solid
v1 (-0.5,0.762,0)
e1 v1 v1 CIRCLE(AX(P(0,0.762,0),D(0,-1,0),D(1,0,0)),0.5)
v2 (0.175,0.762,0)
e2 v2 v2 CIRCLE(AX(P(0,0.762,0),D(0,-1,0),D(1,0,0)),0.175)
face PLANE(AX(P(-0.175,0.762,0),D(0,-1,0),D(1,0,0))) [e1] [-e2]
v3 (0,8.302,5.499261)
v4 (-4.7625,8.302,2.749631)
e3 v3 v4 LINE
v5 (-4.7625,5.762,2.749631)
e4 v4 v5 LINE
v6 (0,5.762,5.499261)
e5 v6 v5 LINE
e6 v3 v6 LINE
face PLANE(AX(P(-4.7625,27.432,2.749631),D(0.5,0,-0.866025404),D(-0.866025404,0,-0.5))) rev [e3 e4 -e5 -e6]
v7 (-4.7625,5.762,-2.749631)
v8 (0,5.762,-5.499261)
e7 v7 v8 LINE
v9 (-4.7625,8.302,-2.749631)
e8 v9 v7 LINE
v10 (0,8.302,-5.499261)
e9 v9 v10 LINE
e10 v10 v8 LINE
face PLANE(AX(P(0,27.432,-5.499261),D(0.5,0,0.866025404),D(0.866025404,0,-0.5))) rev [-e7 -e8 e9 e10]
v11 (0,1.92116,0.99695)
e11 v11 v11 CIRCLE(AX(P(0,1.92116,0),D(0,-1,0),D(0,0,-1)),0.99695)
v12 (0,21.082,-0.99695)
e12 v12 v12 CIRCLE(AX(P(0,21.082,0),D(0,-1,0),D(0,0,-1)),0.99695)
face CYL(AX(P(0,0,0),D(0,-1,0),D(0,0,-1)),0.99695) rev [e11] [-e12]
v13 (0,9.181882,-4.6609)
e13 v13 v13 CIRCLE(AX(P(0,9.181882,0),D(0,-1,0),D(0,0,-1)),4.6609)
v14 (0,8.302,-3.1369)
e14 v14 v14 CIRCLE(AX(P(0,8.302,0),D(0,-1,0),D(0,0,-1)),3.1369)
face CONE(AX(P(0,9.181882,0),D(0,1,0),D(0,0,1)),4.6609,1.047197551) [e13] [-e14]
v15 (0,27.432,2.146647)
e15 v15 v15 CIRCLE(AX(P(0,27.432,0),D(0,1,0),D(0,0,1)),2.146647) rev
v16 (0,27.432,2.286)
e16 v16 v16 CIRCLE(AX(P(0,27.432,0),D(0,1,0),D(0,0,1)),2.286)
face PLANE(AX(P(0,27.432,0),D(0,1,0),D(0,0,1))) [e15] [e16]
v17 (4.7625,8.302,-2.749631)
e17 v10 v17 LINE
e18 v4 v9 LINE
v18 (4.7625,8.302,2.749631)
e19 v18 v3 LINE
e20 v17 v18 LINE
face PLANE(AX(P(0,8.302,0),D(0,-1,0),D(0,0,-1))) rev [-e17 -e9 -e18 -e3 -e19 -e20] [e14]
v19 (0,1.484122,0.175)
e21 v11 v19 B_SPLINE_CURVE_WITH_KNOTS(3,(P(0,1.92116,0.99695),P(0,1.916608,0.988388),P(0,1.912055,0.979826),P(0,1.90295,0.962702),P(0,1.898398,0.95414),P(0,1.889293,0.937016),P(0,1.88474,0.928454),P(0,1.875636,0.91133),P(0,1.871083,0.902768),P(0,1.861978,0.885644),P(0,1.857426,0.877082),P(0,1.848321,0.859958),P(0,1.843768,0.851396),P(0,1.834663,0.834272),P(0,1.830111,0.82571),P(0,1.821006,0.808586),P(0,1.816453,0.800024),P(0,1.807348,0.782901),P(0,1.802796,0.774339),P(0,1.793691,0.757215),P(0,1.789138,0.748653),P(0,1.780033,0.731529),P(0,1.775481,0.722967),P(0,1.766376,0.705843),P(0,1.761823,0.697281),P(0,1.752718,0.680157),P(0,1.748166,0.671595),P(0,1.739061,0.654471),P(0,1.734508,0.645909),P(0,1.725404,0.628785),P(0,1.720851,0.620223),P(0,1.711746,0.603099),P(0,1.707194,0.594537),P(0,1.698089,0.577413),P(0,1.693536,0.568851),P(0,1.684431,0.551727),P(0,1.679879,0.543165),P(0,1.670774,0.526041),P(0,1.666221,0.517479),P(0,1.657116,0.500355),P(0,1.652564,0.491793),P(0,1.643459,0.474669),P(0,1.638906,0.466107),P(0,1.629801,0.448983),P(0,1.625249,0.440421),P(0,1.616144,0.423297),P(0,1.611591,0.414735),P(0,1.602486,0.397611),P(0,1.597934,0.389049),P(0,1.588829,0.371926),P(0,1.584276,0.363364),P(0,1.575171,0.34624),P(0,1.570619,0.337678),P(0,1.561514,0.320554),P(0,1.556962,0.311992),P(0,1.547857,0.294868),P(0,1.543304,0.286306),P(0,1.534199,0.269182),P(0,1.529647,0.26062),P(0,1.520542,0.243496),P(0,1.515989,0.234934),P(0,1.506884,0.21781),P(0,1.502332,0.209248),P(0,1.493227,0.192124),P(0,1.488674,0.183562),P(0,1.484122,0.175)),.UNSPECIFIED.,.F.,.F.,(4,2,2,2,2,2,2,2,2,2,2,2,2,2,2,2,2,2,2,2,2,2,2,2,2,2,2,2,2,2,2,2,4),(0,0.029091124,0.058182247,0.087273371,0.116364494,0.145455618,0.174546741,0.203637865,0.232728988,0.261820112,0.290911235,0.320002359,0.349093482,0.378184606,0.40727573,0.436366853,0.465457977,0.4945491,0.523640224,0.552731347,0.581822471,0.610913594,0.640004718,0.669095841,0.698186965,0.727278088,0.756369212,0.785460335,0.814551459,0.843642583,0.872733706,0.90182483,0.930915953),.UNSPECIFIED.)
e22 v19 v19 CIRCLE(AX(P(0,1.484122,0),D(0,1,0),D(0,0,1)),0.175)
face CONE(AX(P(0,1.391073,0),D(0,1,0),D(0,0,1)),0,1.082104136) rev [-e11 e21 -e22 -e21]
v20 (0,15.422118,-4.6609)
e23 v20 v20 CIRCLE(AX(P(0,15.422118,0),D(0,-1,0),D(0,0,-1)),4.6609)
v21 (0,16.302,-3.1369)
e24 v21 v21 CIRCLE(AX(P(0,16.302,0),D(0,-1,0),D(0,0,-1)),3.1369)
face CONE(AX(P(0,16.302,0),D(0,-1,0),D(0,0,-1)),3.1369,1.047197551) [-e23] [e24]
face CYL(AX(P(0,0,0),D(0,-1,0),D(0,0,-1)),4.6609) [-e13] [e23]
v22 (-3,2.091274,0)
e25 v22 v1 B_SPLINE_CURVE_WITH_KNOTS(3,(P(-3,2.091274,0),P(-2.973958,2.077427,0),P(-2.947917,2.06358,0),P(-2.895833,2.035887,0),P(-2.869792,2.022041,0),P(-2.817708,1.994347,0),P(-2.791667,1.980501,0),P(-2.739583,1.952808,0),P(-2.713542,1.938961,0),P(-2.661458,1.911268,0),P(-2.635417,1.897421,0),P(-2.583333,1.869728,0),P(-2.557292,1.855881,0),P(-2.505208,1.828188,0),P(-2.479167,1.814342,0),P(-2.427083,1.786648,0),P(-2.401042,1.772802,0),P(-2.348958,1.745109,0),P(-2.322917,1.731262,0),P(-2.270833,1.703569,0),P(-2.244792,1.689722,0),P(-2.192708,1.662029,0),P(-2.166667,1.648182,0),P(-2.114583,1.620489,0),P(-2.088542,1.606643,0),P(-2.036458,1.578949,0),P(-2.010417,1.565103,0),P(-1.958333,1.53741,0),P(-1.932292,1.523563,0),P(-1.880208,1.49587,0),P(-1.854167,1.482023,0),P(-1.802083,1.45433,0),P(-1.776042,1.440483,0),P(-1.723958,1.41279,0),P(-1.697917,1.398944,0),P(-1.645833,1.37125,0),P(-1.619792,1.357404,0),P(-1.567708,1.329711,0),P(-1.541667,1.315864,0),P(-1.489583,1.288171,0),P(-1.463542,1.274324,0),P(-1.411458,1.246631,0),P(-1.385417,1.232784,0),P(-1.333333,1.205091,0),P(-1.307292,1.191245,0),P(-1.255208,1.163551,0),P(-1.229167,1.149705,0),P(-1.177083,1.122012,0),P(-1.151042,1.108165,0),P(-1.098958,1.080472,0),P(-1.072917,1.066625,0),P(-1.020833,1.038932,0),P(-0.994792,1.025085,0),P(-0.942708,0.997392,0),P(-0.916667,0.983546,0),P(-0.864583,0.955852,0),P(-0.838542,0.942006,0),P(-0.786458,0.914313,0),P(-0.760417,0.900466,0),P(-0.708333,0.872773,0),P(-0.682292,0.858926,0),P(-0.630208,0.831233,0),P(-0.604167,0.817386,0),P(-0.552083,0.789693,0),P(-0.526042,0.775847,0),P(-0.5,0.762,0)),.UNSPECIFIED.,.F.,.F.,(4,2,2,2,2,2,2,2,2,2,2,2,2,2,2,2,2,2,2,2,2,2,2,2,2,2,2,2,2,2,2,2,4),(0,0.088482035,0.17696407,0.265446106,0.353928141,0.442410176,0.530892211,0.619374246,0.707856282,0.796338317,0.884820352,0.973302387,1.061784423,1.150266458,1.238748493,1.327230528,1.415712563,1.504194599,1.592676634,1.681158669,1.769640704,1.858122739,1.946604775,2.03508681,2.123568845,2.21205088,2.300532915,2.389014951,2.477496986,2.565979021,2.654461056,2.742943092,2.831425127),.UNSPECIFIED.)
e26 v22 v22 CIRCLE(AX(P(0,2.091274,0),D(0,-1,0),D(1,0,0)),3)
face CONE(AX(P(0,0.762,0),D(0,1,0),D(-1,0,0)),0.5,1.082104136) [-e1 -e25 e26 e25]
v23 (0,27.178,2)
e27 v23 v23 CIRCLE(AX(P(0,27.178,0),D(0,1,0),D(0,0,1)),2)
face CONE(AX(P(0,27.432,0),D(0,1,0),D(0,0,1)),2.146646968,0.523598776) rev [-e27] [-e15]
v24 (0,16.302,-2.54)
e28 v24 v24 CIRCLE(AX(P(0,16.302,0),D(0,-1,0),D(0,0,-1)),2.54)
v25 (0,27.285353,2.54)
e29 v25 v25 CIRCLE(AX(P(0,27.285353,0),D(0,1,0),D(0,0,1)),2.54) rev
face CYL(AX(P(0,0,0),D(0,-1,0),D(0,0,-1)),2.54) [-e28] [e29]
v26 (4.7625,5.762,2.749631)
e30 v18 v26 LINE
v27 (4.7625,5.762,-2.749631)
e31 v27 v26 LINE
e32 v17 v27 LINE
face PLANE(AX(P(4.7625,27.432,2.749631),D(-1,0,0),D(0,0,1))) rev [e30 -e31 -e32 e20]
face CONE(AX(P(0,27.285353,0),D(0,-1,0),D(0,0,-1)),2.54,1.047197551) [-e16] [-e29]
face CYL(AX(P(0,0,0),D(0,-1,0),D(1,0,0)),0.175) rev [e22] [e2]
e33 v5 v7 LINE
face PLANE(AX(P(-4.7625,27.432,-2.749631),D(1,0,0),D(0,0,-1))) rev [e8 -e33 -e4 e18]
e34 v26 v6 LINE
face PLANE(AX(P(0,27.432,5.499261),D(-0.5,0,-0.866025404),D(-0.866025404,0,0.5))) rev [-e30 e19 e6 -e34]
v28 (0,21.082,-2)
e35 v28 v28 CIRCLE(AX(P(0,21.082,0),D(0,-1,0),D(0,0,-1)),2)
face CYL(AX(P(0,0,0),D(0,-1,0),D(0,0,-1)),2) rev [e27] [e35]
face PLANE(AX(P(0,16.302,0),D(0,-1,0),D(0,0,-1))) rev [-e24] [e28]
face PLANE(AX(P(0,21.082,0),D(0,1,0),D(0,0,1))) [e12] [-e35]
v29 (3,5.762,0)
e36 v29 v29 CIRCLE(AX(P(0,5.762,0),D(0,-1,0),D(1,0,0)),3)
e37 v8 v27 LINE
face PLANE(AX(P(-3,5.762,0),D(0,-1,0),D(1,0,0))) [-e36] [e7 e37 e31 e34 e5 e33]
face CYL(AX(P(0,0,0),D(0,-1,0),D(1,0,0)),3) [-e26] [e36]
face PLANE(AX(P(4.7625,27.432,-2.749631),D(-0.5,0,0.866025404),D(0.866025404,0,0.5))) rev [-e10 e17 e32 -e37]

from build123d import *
from OCP.BRepFilletAPI import BRepFilletAPI_MakeChamfer

# Parameters (mm, degrees)
BOSS_EXTRUDE1_DEPTH = 27.432
CHAMFER1_SIZE       = 0.254
CHAMFER1_SIZE2      = 0.146646968


# Read off the part's stored shape, not the designer's step: Cut-Revolve4
with BuildPart() as part:
    # Sketch3 → Boss-Extrude1 (new body)
    with BuildSketch(Plane(origin=(0, 0, 0), x_dir=(1, 0, 0), z_dir=(0, 1, 0))):
        Polygon((4.7625, 2.749630657), (0, 5.499261314), (-4.7625, 2.749630657), (-4.7625, -2.749630657), (0, -5.499261314), (4.7625, -2.749630657), align=None)
    extrude(amount=BOSS_EXTRUDE1_DEPTH)

    # Cut-Revolve4 outline → Cut-Revolve4 (revolve, cut)
    with BuildSketch(Plane.XY):
        Polygon((4.6609, 9.18188181), (3.1369, 8.302), (5.499261314, 8.302), (5.499261314, 27.432), (2.54, 27.432), (2.54, 16.302), (3.1369, 16.302), (4.6609, 15.42211819), align=None)
        Polygon((0.99695, 21.082), (2, 21.082), (2, 27.432), (0, 27.432), (0, 1.391072642), (0.99695, 1.92116036), align=None)
    revolve(axis=Axis((0, 0, 0), (0, 1, 0)), mode=Mode.SUBTRACT)

    # Chamfer1: one chamfer whose edges measure the first distance from different faces: ONE call of the kernel's chamfer builder (chamfer() names one face for all edges)
    chamfer1_edges_1 = [part.edges().sort_by_distance(p)[0] for p in [
        (-2.54, 27.432, 0),
    ]]
    chamfer1_side_1 = [part.faces().sort_by_distance(p)[0] for p in [
        (-2.468157951, 27.432, 0),
    ]]
    chamfer1_edges_2 = [part.edges().sort_by_distance(p)[0] for p in [
        (-2, 27.432, 0),
    ]]
    chamfer1_side_2 = [part.faces().sort_by_distance(p)[0] for p in [
        (-2, 24.257, 0),
    ]]
    chamfer1 = BRepFilletAPI_MakeChamfer(part.part.solid().wrapped)
    for e in chamfer1_edges_1:
        chamfer1.Add(CHAMFER1_SIZE, CHAMFER1_SIZE2, e.wrapped, chamfer1_side_1[0].wrapped)  # the first distance lies on this face
    for e in chamfer1_edges_2:
        chamfer1.Add(CHAMFER1_SIZE, CHAMFER1_SIZE2, e.wrapped, chamfer1_side_2[0].wrapped)  # the first distance lies on this face
    add(Compound.cast(chamfer1.Shape()), mode=Mode.REPLACE)

    # Sketch4 → Cut-Revolve5 (revolve, cut)
    with BuildSketch(Plane.XY, mode=Mode.PRIVATE) as cut_revolve5_sk:
        Polygon((-0.175, 0.762), (-0.5, 0.762), (-3, 2.091273579), (-3, 5.762), (-6.107414125, 5.762), (-6.107414125, 0), (0, 0), (0, 1.524), (-0.175, 1.524), align=None)
    revolve(cut_revolve5_sk.sketch.rotate(Axis((0, 0, 0), (0, 1, 0)), 270), axis=Axis((0, 0, 0), (0, 1, 0)), mode=Mode.SUBTRACT)


solid = part.part
